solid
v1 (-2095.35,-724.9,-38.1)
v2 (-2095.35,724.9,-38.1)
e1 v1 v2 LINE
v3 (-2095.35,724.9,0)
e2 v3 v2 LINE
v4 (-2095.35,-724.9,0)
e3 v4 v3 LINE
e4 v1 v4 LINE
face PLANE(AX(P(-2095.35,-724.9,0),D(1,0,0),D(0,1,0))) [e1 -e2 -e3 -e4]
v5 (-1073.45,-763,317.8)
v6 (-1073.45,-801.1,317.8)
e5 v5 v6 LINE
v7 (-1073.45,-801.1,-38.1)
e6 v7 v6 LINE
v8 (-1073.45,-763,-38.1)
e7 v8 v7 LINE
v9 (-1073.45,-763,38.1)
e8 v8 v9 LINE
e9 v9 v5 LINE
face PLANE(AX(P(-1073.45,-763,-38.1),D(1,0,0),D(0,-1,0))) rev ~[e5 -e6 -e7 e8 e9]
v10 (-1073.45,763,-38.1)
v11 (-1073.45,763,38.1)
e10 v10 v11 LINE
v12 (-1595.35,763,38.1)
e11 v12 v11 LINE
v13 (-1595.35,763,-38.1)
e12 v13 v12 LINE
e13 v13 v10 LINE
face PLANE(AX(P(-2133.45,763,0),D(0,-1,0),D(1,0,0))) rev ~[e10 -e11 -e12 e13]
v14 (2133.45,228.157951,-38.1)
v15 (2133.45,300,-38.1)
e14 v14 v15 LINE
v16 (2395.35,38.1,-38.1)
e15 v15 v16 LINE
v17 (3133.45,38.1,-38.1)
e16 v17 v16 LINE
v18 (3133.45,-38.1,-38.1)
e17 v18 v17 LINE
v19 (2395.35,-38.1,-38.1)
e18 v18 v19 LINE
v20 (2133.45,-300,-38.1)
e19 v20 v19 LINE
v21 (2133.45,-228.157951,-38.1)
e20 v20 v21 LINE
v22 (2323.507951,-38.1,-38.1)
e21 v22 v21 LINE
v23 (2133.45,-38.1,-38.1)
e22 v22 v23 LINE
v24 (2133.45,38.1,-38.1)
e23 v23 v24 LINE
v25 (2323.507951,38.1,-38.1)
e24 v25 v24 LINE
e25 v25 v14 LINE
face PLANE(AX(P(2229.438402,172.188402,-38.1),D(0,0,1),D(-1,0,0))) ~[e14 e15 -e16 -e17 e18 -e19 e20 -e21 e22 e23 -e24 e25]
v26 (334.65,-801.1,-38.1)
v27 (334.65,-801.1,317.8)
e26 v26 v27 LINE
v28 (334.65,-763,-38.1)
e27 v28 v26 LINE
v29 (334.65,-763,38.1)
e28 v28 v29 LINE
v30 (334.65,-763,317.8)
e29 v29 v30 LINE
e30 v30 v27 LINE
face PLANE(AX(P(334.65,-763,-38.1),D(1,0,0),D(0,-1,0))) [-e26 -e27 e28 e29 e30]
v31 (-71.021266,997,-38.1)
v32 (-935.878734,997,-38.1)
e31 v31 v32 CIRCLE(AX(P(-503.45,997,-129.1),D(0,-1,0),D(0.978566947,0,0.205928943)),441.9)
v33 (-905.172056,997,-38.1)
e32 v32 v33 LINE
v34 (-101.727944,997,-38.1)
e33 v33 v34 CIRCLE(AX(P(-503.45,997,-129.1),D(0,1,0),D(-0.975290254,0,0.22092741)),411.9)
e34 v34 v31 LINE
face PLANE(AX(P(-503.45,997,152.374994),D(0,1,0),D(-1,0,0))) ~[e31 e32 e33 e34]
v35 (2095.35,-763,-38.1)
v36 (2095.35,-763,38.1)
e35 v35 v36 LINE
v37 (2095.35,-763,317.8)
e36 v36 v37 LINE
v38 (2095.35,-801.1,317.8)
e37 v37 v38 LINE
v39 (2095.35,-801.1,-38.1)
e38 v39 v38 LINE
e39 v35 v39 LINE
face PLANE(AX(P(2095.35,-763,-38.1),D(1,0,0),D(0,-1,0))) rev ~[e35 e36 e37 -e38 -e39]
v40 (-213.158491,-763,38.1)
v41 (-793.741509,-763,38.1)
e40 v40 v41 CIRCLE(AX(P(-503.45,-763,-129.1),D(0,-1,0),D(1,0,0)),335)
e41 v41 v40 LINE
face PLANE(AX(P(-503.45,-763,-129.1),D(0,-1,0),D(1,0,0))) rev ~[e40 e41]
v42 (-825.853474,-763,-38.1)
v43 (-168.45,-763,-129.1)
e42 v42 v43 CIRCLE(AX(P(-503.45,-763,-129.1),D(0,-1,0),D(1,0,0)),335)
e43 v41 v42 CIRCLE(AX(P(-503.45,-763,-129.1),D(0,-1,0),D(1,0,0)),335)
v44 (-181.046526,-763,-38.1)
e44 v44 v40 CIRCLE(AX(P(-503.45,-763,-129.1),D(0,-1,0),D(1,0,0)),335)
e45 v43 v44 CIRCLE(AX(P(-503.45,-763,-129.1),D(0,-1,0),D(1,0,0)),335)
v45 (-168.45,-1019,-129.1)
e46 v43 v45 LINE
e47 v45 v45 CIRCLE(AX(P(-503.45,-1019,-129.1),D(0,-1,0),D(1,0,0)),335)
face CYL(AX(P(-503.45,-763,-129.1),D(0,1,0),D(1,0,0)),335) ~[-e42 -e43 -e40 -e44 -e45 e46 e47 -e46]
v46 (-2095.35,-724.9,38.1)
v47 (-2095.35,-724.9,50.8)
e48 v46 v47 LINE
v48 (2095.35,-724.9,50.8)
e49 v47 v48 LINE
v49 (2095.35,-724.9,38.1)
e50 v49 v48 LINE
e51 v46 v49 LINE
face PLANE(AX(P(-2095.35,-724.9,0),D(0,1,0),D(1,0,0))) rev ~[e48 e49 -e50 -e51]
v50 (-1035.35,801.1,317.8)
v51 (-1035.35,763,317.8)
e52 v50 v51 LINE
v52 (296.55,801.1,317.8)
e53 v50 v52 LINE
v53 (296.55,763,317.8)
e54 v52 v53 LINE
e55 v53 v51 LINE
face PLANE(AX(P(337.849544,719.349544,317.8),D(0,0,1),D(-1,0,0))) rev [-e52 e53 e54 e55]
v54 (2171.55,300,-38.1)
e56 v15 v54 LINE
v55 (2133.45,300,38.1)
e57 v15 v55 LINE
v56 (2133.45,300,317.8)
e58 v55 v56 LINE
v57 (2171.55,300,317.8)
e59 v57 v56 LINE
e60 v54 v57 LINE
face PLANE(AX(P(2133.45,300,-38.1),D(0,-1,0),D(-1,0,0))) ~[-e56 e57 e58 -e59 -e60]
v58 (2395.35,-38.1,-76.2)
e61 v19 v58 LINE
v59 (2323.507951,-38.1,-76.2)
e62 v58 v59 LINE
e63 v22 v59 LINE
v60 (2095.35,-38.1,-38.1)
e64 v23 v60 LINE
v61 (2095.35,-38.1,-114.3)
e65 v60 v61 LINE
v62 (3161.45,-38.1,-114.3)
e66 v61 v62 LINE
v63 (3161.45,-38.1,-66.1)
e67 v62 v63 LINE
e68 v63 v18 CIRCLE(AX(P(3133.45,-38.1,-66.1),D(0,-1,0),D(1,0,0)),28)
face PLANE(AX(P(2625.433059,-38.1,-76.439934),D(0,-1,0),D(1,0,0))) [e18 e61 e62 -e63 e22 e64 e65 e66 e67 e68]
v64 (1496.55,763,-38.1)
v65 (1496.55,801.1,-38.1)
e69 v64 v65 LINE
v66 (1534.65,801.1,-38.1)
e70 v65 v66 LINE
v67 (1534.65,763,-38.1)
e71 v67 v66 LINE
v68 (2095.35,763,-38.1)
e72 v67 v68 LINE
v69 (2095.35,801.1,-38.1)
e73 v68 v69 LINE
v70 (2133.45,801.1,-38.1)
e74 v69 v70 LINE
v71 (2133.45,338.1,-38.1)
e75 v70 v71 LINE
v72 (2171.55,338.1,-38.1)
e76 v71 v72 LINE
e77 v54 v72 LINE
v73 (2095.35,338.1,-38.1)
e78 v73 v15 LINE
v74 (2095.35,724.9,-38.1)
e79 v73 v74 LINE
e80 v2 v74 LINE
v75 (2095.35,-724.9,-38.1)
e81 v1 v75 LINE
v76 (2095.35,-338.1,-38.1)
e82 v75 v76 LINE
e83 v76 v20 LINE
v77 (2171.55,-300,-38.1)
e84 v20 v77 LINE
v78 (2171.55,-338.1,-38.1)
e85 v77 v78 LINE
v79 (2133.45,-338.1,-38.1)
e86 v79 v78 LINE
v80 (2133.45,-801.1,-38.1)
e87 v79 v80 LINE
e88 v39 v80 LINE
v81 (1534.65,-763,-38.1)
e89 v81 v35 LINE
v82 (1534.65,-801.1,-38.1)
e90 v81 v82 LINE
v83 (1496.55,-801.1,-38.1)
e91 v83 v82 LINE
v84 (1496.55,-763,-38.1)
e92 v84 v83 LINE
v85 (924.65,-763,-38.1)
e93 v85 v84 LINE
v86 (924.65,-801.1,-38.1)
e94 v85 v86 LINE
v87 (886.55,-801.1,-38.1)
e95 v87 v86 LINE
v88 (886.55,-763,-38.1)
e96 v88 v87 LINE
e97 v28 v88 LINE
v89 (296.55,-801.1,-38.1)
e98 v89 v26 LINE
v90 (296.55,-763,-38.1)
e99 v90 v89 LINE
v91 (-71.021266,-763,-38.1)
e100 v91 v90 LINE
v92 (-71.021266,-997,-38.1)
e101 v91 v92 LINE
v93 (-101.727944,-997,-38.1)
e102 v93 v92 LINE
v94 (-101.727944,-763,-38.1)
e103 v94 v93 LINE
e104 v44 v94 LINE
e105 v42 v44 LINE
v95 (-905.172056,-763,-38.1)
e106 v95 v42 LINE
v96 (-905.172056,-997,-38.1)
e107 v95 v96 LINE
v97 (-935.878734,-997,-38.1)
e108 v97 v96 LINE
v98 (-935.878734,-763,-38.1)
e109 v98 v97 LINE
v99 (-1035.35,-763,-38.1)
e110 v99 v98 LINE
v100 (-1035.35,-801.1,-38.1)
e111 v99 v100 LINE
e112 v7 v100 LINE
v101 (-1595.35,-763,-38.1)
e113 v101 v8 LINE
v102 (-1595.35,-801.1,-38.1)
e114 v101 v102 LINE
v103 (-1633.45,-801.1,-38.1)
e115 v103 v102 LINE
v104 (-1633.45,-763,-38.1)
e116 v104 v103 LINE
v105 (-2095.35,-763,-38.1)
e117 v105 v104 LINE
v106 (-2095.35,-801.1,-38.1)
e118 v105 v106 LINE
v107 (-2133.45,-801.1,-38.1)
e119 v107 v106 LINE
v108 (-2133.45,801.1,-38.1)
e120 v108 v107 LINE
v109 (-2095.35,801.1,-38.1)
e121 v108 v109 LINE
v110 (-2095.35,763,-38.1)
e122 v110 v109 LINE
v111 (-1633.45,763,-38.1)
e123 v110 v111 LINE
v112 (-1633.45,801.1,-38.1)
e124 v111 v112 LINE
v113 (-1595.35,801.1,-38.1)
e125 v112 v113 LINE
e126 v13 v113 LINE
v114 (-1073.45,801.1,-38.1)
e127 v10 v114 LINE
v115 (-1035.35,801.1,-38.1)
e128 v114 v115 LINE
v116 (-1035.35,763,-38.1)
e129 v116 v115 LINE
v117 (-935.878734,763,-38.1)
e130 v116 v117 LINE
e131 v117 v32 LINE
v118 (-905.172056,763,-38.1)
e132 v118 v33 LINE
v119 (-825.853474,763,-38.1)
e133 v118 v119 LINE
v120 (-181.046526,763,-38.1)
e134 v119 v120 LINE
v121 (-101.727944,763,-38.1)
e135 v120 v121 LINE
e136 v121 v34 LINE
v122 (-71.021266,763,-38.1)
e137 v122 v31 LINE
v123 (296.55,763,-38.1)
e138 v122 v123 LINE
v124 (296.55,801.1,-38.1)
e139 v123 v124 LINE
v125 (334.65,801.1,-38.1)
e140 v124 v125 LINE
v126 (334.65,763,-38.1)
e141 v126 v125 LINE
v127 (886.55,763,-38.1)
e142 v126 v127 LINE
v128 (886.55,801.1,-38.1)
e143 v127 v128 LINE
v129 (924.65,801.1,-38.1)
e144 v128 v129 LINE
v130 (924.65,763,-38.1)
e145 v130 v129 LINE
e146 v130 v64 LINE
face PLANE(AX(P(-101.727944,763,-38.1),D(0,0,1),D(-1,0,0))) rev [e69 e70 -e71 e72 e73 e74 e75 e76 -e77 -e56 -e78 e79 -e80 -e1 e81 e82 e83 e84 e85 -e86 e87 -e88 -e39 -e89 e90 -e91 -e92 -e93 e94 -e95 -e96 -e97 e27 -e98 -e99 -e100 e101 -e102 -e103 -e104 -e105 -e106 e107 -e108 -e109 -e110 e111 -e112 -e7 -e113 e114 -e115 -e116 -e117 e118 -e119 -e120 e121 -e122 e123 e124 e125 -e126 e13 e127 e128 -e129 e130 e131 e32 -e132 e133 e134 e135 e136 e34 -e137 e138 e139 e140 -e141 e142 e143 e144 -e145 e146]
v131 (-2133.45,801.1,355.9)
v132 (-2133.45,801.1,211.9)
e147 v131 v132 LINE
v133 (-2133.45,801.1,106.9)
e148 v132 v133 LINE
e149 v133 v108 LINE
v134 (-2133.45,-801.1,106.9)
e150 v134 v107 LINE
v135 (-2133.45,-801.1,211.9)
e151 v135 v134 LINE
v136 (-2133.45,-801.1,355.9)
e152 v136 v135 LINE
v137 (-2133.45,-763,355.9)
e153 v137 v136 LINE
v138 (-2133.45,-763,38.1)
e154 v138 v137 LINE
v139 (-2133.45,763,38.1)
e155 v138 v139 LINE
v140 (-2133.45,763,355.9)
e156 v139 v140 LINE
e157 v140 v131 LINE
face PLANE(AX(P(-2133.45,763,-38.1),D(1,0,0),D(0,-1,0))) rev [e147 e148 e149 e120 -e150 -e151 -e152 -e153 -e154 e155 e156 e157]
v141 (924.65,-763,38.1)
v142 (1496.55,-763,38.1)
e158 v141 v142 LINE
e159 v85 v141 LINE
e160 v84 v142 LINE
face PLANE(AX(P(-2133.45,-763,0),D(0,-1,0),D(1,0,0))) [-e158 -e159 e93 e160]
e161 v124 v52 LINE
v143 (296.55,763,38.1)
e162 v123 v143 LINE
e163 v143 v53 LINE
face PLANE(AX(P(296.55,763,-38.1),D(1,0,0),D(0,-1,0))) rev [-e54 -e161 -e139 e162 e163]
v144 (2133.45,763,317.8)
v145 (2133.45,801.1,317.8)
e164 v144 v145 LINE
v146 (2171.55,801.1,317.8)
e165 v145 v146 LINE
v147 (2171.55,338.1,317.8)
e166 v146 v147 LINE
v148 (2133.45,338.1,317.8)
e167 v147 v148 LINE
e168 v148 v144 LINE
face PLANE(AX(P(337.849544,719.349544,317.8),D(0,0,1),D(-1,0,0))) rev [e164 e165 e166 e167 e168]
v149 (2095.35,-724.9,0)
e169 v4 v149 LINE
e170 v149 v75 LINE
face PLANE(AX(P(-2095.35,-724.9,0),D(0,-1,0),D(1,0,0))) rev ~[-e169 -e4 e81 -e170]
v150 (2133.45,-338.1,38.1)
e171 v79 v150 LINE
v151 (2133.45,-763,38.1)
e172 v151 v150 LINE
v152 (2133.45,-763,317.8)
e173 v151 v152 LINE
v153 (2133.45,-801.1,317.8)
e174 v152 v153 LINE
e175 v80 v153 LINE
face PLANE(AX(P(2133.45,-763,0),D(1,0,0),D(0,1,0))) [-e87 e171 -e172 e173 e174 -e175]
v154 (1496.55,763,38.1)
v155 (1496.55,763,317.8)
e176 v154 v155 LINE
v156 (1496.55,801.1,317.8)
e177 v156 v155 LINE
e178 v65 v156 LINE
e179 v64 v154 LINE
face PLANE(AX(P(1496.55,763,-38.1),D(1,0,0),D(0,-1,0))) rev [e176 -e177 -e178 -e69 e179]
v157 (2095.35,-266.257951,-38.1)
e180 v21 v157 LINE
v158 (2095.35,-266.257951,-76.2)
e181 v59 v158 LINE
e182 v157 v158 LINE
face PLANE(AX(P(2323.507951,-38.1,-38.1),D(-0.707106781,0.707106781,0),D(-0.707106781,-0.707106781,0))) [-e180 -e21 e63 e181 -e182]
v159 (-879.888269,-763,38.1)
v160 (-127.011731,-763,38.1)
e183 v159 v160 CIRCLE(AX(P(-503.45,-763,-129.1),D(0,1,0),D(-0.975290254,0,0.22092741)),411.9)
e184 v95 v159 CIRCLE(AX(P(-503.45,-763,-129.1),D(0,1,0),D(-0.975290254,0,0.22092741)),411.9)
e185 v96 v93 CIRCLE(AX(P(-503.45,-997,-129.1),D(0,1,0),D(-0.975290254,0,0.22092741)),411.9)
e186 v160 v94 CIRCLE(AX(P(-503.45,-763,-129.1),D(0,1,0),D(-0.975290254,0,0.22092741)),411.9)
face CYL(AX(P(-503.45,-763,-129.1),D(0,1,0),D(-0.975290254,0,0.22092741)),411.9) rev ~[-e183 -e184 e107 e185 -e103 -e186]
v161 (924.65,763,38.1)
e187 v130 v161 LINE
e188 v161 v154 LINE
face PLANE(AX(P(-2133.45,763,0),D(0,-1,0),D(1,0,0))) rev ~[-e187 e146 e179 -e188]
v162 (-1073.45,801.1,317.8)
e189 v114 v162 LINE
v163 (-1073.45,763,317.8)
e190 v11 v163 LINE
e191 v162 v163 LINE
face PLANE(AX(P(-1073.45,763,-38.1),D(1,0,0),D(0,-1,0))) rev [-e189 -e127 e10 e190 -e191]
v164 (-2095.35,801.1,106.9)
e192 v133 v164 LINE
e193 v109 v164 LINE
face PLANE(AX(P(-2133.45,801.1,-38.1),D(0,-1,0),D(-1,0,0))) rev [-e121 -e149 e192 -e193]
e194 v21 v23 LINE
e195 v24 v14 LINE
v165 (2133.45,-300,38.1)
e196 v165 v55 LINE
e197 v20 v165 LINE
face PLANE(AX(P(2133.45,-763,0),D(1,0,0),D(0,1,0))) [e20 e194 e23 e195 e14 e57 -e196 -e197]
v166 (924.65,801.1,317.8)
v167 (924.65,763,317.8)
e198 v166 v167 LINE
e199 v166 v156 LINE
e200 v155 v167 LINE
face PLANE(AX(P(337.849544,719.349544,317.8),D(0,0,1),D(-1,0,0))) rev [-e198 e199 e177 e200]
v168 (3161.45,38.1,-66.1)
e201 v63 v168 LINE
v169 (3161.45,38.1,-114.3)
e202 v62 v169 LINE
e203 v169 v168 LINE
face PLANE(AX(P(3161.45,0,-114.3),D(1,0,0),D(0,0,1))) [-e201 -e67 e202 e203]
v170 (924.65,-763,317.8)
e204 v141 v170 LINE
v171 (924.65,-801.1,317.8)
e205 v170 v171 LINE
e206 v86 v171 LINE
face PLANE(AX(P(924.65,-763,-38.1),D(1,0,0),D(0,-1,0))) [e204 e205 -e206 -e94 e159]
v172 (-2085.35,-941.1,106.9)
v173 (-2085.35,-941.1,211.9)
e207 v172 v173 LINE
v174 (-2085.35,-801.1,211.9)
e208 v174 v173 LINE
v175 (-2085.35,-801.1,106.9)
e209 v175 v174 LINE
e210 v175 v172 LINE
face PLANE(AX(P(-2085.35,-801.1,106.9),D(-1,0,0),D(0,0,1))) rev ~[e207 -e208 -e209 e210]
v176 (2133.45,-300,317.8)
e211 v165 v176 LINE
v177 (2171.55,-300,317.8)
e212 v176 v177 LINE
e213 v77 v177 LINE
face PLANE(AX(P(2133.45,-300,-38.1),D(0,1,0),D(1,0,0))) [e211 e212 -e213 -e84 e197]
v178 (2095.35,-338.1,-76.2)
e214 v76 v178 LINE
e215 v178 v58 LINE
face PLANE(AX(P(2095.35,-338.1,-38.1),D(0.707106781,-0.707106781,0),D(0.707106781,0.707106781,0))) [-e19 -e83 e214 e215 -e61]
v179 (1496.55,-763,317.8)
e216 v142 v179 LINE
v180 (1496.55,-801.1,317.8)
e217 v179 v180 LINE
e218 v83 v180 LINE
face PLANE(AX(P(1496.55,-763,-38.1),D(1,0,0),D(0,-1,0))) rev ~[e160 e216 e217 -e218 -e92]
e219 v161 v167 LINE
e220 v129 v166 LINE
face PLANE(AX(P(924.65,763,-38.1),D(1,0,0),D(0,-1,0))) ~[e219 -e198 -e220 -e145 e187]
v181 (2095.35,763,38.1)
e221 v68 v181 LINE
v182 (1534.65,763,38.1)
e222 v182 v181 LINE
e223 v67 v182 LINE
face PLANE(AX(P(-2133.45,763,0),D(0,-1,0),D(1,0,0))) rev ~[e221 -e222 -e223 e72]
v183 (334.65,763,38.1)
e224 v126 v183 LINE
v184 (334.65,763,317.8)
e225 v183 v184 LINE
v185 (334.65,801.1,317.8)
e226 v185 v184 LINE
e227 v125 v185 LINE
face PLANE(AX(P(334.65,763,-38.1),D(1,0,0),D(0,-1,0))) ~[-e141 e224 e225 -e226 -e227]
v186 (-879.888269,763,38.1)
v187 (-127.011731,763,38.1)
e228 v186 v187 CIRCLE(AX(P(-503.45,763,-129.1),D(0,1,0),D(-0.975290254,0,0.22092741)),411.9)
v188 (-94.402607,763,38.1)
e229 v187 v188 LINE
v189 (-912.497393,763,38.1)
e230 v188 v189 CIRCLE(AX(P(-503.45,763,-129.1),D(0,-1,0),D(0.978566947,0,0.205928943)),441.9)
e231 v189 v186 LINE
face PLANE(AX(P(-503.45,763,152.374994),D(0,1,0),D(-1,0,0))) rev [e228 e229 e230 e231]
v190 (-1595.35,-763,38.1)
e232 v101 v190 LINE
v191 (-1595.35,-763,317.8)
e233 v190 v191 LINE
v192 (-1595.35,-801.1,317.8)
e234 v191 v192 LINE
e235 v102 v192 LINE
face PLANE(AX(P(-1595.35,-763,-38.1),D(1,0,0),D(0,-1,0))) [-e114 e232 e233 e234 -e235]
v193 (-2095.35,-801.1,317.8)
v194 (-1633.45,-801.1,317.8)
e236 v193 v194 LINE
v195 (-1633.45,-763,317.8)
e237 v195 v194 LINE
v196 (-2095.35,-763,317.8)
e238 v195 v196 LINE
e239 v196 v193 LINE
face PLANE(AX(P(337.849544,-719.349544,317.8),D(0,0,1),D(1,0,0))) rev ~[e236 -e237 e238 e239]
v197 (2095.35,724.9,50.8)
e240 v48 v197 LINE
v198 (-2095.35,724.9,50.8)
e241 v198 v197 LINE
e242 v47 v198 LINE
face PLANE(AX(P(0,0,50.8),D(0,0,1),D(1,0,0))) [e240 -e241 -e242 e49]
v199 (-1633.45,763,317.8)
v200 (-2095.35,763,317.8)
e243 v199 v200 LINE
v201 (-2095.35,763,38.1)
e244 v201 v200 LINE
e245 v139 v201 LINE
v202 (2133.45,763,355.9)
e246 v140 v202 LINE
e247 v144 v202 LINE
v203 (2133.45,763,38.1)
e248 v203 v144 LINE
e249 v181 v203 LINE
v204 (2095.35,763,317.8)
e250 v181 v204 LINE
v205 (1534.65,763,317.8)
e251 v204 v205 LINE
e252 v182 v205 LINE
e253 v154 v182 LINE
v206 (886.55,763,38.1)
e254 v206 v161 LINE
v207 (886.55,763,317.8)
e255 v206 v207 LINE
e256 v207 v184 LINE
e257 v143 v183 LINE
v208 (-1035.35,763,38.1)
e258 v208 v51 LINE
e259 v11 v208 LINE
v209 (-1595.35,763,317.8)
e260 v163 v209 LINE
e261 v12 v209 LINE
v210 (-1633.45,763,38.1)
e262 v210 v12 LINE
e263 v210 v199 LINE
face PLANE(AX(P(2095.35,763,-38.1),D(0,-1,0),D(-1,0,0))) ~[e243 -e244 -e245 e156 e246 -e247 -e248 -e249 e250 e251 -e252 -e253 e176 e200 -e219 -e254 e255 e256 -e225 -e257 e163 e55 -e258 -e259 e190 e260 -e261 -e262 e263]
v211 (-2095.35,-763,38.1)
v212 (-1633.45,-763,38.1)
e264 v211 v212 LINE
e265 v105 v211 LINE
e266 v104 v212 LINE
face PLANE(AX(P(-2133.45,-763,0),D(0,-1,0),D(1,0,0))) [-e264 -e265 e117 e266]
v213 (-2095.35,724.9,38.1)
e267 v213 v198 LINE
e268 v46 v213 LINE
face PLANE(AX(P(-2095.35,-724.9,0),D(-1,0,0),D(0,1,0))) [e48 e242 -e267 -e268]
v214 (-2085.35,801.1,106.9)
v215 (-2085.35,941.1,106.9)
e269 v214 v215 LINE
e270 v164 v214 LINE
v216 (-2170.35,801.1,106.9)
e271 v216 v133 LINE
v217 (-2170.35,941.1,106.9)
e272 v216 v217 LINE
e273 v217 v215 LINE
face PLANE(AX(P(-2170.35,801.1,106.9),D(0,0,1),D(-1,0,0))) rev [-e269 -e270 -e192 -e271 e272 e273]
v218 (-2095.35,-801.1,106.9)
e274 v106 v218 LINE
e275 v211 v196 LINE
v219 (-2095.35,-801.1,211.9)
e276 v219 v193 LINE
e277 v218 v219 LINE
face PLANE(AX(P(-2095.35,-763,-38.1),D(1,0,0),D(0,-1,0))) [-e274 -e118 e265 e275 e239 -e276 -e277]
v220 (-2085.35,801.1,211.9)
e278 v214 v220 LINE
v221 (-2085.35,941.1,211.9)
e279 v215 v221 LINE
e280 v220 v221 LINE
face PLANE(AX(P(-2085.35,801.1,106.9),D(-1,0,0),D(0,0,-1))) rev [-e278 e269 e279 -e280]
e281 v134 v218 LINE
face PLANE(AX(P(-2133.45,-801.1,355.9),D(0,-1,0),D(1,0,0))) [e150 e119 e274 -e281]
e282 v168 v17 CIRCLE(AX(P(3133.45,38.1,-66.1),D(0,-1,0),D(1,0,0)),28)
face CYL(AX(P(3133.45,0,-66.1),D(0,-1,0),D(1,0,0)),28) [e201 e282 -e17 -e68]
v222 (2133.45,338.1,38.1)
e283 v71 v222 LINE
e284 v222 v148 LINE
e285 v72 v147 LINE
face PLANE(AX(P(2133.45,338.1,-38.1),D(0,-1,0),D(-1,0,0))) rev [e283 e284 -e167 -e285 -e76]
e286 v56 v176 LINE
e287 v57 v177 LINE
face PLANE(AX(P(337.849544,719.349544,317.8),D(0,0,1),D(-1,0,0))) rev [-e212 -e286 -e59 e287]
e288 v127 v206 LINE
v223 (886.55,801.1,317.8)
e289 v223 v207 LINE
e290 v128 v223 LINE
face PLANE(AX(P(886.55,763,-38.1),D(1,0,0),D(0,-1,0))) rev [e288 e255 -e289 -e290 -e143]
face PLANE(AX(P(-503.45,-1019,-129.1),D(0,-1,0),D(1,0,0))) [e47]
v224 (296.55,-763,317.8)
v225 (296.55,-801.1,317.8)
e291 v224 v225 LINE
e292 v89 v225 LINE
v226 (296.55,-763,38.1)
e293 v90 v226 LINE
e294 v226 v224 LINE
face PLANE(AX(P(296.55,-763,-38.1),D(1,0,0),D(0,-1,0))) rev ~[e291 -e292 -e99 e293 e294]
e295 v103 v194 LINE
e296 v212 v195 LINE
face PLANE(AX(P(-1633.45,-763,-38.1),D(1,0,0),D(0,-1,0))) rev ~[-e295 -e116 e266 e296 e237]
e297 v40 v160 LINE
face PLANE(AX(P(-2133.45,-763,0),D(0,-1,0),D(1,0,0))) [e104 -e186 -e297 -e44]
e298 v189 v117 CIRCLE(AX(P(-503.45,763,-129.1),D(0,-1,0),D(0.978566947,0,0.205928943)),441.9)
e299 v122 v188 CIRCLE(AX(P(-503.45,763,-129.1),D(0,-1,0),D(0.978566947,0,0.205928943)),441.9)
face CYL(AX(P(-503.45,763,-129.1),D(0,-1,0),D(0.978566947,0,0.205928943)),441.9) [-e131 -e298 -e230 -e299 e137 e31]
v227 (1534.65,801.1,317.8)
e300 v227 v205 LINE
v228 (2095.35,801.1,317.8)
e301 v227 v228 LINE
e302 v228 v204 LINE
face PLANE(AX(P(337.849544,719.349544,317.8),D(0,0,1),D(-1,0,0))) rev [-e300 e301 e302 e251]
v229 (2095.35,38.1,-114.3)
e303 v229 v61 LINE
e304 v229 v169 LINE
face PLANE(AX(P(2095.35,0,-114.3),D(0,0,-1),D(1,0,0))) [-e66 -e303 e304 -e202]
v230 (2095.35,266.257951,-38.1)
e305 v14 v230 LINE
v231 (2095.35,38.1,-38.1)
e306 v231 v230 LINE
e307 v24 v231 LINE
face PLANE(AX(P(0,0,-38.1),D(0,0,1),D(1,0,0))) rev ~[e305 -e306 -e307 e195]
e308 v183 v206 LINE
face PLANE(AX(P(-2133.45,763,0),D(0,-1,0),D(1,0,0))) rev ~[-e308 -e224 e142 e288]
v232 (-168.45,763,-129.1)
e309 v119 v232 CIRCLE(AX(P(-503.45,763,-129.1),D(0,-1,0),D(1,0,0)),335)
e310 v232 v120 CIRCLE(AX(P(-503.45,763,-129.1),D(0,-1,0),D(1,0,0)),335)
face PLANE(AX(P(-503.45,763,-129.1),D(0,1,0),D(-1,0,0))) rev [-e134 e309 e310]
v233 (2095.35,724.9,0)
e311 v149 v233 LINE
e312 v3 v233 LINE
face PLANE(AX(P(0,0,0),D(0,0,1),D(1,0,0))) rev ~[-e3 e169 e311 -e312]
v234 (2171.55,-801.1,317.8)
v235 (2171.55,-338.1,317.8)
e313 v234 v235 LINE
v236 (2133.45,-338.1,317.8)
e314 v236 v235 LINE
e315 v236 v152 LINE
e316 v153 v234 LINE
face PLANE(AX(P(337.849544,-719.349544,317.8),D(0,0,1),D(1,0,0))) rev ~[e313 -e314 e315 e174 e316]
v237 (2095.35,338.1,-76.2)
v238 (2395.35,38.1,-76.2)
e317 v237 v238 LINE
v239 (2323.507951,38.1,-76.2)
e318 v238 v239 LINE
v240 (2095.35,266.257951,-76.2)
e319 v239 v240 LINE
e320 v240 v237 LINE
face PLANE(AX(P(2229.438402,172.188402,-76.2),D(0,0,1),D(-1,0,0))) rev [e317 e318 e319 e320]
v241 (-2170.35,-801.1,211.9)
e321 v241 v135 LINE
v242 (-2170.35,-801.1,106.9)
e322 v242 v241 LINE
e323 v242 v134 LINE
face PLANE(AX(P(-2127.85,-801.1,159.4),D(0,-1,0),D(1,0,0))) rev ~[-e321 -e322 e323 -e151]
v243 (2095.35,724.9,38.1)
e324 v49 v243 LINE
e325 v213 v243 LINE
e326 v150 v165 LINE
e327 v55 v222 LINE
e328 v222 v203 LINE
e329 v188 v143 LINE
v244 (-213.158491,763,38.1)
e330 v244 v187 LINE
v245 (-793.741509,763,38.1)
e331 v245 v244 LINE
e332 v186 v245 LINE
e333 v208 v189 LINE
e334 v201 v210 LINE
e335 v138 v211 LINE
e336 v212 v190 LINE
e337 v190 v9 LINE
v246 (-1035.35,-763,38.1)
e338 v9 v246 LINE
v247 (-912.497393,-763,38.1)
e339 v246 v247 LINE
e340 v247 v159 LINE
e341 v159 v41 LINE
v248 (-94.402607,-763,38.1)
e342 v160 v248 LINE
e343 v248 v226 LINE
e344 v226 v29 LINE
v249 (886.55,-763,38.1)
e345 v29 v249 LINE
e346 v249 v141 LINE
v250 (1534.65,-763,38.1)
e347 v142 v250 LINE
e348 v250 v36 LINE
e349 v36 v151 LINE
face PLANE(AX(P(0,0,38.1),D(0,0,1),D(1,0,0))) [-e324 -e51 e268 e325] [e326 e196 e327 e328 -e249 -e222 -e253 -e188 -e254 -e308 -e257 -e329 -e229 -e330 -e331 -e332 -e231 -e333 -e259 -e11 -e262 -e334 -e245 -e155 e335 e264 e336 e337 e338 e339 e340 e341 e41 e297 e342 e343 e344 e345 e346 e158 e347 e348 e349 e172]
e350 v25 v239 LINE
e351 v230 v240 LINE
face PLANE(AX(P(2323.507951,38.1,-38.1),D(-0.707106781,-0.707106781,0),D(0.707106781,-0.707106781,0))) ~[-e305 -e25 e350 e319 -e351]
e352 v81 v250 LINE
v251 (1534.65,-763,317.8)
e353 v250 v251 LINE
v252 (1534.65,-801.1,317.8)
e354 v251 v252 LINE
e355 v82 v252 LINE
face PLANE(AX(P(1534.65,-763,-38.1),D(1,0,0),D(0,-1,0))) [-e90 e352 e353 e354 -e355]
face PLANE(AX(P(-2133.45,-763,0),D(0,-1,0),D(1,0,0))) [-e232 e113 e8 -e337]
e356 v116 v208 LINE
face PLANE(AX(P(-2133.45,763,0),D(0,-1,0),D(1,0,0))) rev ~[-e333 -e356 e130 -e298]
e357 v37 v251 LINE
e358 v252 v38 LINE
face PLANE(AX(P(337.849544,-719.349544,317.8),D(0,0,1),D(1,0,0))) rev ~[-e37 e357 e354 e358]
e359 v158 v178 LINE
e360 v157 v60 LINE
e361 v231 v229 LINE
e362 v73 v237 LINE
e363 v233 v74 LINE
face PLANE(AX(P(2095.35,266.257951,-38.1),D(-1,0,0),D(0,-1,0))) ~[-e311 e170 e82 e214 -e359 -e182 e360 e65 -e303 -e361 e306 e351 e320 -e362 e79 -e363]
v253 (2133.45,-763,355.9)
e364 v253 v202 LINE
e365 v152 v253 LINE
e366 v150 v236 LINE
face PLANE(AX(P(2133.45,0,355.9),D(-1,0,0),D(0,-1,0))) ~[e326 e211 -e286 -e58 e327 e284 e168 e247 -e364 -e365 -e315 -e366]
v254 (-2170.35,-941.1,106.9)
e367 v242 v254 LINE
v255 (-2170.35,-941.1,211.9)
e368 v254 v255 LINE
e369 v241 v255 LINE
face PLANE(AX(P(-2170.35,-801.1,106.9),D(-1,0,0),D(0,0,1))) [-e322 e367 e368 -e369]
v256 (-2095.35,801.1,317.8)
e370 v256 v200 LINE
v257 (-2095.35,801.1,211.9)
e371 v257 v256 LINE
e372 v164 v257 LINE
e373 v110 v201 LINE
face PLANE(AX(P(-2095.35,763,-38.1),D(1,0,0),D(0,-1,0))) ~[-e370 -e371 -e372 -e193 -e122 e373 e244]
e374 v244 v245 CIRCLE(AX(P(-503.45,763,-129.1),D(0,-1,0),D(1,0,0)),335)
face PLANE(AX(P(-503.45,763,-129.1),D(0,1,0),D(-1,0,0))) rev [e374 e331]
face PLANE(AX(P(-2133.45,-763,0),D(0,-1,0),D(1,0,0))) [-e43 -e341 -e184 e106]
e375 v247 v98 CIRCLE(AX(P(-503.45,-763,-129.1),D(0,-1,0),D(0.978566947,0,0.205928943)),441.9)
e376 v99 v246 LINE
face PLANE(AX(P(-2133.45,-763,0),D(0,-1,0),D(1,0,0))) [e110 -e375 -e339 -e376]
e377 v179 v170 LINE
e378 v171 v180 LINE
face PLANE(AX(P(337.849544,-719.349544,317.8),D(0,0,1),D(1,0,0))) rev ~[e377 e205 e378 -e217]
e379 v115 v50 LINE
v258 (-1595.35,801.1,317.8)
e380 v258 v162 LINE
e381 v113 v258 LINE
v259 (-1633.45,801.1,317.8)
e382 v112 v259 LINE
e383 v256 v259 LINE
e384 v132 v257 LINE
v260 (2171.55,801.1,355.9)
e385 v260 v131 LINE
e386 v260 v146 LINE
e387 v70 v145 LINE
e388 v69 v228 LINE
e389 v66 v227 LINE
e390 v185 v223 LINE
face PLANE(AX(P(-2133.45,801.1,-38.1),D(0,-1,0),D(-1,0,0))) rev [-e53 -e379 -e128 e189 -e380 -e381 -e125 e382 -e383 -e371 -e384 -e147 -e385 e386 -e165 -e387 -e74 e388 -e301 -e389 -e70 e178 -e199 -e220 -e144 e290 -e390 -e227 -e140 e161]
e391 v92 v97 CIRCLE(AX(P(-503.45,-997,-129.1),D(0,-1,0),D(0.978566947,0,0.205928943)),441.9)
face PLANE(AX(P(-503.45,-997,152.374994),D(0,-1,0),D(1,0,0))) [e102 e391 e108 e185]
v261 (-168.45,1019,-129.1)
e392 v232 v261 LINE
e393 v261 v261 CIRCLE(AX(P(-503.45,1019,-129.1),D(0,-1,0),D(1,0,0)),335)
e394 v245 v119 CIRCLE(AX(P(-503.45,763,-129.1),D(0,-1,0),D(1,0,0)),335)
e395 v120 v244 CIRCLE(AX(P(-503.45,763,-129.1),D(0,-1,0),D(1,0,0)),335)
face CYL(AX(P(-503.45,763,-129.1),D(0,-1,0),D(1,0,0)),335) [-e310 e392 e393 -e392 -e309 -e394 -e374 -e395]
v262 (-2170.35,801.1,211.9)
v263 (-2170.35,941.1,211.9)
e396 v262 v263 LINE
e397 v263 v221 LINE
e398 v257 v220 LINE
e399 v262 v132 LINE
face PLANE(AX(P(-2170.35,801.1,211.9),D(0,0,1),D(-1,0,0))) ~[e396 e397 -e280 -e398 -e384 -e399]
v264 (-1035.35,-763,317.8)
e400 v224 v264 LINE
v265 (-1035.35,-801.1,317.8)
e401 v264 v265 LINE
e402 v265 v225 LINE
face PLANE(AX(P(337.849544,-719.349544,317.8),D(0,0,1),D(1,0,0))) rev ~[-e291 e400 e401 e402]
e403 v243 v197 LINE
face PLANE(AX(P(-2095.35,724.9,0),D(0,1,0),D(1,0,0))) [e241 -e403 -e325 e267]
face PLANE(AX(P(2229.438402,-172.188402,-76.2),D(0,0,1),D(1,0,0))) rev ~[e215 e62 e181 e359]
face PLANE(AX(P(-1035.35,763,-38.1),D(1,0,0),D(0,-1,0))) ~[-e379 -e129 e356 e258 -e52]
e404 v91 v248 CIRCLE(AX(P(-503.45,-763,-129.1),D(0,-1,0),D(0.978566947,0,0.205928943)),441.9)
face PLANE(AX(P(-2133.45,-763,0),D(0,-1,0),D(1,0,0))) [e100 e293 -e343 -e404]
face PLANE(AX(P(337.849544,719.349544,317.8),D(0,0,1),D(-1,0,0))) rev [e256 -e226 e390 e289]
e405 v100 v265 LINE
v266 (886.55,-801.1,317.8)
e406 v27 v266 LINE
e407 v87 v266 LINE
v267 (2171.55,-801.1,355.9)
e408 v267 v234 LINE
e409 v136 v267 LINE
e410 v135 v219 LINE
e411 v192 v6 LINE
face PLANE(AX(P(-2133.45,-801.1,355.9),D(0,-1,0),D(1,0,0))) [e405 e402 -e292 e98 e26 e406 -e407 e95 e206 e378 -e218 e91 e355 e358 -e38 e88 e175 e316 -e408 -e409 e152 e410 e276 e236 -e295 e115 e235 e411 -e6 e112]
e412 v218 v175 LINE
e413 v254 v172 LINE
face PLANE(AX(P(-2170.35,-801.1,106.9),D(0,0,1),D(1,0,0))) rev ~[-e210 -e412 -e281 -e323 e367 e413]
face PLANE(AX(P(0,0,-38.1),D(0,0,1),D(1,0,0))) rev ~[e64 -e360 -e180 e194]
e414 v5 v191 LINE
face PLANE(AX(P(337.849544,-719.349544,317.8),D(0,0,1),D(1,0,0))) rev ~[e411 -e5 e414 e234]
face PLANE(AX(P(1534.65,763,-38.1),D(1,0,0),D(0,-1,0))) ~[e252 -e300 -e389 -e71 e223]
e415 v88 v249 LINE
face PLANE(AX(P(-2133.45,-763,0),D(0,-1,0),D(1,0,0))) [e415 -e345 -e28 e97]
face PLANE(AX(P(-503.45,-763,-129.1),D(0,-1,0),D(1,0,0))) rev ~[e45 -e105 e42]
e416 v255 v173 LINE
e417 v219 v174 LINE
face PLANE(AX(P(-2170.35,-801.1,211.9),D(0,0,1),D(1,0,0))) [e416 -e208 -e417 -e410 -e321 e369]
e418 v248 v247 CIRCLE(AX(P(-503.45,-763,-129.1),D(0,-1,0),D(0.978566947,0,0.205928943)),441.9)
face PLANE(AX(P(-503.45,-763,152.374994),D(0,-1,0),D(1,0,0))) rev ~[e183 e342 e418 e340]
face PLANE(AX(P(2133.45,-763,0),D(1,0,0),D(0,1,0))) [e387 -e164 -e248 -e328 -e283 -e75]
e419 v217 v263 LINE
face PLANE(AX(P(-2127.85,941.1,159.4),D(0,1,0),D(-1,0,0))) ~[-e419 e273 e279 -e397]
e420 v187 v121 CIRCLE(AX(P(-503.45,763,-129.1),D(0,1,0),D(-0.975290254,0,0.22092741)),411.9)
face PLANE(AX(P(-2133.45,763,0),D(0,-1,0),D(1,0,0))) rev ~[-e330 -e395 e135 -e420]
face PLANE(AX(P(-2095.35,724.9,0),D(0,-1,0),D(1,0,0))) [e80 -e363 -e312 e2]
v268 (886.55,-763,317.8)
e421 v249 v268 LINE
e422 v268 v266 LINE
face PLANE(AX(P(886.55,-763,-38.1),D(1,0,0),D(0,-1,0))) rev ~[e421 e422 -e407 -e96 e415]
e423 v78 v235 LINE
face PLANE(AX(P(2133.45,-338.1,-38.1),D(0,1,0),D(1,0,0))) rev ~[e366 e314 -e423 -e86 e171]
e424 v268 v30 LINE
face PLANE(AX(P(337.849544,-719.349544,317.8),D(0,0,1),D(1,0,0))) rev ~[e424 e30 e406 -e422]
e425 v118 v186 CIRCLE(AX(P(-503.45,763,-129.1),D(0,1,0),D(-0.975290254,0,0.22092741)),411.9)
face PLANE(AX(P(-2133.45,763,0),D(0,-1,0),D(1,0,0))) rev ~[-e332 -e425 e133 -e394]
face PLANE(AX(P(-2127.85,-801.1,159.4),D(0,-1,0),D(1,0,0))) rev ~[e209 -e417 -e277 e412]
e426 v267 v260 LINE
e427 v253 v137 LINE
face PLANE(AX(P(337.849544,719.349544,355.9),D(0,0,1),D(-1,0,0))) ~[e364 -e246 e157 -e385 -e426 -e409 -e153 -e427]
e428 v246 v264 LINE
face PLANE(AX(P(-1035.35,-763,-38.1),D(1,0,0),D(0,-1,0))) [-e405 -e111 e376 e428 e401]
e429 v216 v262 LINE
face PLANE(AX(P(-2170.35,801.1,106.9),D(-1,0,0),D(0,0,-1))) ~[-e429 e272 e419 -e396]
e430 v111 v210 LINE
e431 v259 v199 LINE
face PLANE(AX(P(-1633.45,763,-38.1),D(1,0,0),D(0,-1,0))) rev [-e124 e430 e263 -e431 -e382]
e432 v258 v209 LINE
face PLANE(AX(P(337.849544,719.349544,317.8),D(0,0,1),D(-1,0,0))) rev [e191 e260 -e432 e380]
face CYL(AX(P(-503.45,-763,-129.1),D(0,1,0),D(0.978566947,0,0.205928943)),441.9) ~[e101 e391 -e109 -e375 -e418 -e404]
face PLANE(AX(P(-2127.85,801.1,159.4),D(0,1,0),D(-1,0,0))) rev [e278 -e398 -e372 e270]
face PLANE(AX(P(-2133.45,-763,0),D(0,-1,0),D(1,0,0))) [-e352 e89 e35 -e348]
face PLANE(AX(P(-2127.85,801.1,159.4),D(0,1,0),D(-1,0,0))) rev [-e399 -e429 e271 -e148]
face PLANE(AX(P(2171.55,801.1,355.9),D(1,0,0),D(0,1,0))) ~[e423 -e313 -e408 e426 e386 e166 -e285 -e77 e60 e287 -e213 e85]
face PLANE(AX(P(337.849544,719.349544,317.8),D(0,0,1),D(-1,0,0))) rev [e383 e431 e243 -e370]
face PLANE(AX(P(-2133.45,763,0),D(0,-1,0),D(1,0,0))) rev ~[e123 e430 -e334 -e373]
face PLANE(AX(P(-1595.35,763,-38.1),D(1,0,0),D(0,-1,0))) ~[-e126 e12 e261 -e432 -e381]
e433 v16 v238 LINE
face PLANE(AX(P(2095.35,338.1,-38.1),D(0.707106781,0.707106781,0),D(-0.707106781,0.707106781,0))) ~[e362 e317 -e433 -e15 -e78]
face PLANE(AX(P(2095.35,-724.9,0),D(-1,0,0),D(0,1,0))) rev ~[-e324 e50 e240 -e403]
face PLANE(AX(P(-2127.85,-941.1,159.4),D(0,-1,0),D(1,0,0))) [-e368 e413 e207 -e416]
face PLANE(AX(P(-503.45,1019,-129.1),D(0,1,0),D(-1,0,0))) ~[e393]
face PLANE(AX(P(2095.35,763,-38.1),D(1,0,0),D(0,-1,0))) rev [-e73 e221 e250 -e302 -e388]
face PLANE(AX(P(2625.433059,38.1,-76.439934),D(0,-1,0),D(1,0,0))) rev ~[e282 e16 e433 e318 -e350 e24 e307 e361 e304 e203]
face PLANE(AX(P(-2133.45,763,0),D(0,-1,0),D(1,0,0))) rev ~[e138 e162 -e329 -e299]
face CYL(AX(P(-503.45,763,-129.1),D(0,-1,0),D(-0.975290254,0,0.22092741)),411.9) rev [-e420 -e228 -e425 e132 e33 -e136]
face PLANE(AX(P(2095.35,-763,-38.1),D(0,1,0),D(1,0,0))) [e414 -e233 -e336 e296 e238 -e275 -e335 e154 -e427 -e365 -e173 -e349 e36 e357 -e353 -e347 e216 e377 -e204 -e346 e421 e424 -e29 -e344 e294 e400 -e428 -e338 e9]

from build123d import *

# Parameters (mm, degrees)
F0_W      = 4266.9
F0_H      = 1526
F0_W_2    = 4190.7
F0_H_2    = 1449.8
F1_DEPTH  = 38.1
F2_DEPTH  = 50.8
F4_DEPTH  = 38.1
F6_DEPTH  = 38.1
F7_W      = 38.1
F7_H      = 38.1
F8_DEPTH  = 394
F10_DEPTH = 38.1
F11_W     = 85
F11_H     = 105
F12_DEPTH = 140
F13_R     = 335
F14_DEPTH = 256
F16_DEPTH = 234


# Not quite as in the source:
# - a pattern or mirror of a feature is missing from the dataset's text; its kind, count and spacing are read off the source's solid


with BuildPart() as f1:
    # F0 (on Top) → F1 (new body, symmetric)
    with BuildSketch(Plane.XY):
        Rectangle(F0_W, F0_H)
        Rectangle(F0_W_2, F0_H_2, mode=Mode.SUBTRACT)
    extrude(amount=F1_DEPTH, both=True)

    # F0 (on Top) → F2 (join)
    with BuildSketch(Plane.XY):
        Rectangle(F0_W_2, F0_H_2)
    extrude(amount=F2_DEPTH)

    # F3 (on Front) → F4 (join, symmetric)
    with BuildSketch(Plane.XZ):
        with BuildLine():
            Line((3133.45, -38.1), (2095.35, -38.1))
            Line((2095.35, -38.1), (2095.35, -114.3))
            Line((2095.35, -114.3), (3161.45, -114.3))
            Line((3161.45, -114.3), (3161.45, -66.1))
            ThreePointArc((3161.45, -66.1), (3153.2489898732, -46.3010101268), (3133.45, -38.1))
        make_face()
    extrude(amount=F4_DEPTH, both=True)

    # F5 (on face) → F6 (join)
    with BuildSketch(Plane.XY.offset(-38.1)):
        Polygon((2395.35, -38.1), (2323.5079510314, -38.1), (2095.35, -266.2579510314), (2095.35, -338.1), align=None)
    f6 = extrude(amount=-F6_DEPTH)

    # F6_copies: F6 across plane
    add(f6.mirror(Plane.ZX))

    # F7 (on face) → F8 (join)
    with BuildSketch(Plane(origin=(0, 0, -38.1), x_dir=(1, 0, 0), z_dir=(0, 0, -1))):
        with Locations((-2114.4, 782.05)):
            Rectangle(F7_W, F7_H)
        with Locations((-1614.4, 782.05)):
            Rectangle(F7_W, F7_H)
        with Locations((-1054.4, 782.05)):
            Rectangle(F7_W, F7_H)
        with Locations((315.6, 782.05)):
            Rectangle(F7_W, F7_H)
        with Locations((905.6, 782.05)):
            Rectangle(F7_W, F7_H)
        with Locations((1515.6, 782.05)):
            Rectangle(F7_W, F7_H)
        with Locations((2114.4, 782.05)):
            Rectangle(F7_W, F7_H)
        with Locations((2152.5, 319.05)):
            Rectangle(F7_W, F7_H)
    f8 = extrude(amount=-F8_DEPTH)

    # F8_copies: F8 across plane
    add(f8.mirror(Plane.ZX))

    # F9 (on face) → F10 (join)
    with BuildSketch(Plane.XY.offset(355.9)):
        Polygon((2133.45, 0), (2133.45, -763), (-2133.45, -763), (-2133.45, -801.1), (2171.55, -801.1), (2171.55, 0), align=None)
    f10 = extrude(amount=-F10_DEPTH)

    # F10_copies: F10 across plane
    add(f10.mirror(Plane.ZX))

    # F11 (on face) → F12 (join)
    with BuildSketch(Plane.XZ.offset(801.1)):
        with Locations((-2127.85, 159.4)):
            Rectangle(F11_W, F11_H)
    f12 = extrude(amount=F12_DEPTH)

    # F12_copies: F12 across plane
    add(f12.mirror(Plane.ZX))

    # F13 (on face) → F14 (join)
    with BuildSketch(Plane.XZ.offset(763)):
        with Locations((-503.45, -129.1)):
            Circle(F13_R)
    f14 = extrude(amount=F14_DEPTH)

    # F14_copies: F14 across plane
    add(f14.mirror(Plane.ZX))

    # F15 (on face) → F16 (join)
    with BuildSketch(Plane.XZ.offset(763)):
        with BuildLine():
            Line((-101.7279443446, -38.1), (-71.0212659871, -38.1))
            ThreePointArc((-71.0212659871, -38.1), (-503.45, 312.8), (-935.8787340129, -38.1))
            Line((-935.8787340129, -38.1), (-905.1720556554, -38.1))
            ThreePointArc((-905.1720556554, -38.1), (-503.45, 282.8), (-101.7279443446, -38.1))
        make_face()
    f16 = extrude(amount=F16_DEPTH)

    # F16_copies: F16 across plane
    add(f16.mirror(Plane.ZX))


solid = f1.part
